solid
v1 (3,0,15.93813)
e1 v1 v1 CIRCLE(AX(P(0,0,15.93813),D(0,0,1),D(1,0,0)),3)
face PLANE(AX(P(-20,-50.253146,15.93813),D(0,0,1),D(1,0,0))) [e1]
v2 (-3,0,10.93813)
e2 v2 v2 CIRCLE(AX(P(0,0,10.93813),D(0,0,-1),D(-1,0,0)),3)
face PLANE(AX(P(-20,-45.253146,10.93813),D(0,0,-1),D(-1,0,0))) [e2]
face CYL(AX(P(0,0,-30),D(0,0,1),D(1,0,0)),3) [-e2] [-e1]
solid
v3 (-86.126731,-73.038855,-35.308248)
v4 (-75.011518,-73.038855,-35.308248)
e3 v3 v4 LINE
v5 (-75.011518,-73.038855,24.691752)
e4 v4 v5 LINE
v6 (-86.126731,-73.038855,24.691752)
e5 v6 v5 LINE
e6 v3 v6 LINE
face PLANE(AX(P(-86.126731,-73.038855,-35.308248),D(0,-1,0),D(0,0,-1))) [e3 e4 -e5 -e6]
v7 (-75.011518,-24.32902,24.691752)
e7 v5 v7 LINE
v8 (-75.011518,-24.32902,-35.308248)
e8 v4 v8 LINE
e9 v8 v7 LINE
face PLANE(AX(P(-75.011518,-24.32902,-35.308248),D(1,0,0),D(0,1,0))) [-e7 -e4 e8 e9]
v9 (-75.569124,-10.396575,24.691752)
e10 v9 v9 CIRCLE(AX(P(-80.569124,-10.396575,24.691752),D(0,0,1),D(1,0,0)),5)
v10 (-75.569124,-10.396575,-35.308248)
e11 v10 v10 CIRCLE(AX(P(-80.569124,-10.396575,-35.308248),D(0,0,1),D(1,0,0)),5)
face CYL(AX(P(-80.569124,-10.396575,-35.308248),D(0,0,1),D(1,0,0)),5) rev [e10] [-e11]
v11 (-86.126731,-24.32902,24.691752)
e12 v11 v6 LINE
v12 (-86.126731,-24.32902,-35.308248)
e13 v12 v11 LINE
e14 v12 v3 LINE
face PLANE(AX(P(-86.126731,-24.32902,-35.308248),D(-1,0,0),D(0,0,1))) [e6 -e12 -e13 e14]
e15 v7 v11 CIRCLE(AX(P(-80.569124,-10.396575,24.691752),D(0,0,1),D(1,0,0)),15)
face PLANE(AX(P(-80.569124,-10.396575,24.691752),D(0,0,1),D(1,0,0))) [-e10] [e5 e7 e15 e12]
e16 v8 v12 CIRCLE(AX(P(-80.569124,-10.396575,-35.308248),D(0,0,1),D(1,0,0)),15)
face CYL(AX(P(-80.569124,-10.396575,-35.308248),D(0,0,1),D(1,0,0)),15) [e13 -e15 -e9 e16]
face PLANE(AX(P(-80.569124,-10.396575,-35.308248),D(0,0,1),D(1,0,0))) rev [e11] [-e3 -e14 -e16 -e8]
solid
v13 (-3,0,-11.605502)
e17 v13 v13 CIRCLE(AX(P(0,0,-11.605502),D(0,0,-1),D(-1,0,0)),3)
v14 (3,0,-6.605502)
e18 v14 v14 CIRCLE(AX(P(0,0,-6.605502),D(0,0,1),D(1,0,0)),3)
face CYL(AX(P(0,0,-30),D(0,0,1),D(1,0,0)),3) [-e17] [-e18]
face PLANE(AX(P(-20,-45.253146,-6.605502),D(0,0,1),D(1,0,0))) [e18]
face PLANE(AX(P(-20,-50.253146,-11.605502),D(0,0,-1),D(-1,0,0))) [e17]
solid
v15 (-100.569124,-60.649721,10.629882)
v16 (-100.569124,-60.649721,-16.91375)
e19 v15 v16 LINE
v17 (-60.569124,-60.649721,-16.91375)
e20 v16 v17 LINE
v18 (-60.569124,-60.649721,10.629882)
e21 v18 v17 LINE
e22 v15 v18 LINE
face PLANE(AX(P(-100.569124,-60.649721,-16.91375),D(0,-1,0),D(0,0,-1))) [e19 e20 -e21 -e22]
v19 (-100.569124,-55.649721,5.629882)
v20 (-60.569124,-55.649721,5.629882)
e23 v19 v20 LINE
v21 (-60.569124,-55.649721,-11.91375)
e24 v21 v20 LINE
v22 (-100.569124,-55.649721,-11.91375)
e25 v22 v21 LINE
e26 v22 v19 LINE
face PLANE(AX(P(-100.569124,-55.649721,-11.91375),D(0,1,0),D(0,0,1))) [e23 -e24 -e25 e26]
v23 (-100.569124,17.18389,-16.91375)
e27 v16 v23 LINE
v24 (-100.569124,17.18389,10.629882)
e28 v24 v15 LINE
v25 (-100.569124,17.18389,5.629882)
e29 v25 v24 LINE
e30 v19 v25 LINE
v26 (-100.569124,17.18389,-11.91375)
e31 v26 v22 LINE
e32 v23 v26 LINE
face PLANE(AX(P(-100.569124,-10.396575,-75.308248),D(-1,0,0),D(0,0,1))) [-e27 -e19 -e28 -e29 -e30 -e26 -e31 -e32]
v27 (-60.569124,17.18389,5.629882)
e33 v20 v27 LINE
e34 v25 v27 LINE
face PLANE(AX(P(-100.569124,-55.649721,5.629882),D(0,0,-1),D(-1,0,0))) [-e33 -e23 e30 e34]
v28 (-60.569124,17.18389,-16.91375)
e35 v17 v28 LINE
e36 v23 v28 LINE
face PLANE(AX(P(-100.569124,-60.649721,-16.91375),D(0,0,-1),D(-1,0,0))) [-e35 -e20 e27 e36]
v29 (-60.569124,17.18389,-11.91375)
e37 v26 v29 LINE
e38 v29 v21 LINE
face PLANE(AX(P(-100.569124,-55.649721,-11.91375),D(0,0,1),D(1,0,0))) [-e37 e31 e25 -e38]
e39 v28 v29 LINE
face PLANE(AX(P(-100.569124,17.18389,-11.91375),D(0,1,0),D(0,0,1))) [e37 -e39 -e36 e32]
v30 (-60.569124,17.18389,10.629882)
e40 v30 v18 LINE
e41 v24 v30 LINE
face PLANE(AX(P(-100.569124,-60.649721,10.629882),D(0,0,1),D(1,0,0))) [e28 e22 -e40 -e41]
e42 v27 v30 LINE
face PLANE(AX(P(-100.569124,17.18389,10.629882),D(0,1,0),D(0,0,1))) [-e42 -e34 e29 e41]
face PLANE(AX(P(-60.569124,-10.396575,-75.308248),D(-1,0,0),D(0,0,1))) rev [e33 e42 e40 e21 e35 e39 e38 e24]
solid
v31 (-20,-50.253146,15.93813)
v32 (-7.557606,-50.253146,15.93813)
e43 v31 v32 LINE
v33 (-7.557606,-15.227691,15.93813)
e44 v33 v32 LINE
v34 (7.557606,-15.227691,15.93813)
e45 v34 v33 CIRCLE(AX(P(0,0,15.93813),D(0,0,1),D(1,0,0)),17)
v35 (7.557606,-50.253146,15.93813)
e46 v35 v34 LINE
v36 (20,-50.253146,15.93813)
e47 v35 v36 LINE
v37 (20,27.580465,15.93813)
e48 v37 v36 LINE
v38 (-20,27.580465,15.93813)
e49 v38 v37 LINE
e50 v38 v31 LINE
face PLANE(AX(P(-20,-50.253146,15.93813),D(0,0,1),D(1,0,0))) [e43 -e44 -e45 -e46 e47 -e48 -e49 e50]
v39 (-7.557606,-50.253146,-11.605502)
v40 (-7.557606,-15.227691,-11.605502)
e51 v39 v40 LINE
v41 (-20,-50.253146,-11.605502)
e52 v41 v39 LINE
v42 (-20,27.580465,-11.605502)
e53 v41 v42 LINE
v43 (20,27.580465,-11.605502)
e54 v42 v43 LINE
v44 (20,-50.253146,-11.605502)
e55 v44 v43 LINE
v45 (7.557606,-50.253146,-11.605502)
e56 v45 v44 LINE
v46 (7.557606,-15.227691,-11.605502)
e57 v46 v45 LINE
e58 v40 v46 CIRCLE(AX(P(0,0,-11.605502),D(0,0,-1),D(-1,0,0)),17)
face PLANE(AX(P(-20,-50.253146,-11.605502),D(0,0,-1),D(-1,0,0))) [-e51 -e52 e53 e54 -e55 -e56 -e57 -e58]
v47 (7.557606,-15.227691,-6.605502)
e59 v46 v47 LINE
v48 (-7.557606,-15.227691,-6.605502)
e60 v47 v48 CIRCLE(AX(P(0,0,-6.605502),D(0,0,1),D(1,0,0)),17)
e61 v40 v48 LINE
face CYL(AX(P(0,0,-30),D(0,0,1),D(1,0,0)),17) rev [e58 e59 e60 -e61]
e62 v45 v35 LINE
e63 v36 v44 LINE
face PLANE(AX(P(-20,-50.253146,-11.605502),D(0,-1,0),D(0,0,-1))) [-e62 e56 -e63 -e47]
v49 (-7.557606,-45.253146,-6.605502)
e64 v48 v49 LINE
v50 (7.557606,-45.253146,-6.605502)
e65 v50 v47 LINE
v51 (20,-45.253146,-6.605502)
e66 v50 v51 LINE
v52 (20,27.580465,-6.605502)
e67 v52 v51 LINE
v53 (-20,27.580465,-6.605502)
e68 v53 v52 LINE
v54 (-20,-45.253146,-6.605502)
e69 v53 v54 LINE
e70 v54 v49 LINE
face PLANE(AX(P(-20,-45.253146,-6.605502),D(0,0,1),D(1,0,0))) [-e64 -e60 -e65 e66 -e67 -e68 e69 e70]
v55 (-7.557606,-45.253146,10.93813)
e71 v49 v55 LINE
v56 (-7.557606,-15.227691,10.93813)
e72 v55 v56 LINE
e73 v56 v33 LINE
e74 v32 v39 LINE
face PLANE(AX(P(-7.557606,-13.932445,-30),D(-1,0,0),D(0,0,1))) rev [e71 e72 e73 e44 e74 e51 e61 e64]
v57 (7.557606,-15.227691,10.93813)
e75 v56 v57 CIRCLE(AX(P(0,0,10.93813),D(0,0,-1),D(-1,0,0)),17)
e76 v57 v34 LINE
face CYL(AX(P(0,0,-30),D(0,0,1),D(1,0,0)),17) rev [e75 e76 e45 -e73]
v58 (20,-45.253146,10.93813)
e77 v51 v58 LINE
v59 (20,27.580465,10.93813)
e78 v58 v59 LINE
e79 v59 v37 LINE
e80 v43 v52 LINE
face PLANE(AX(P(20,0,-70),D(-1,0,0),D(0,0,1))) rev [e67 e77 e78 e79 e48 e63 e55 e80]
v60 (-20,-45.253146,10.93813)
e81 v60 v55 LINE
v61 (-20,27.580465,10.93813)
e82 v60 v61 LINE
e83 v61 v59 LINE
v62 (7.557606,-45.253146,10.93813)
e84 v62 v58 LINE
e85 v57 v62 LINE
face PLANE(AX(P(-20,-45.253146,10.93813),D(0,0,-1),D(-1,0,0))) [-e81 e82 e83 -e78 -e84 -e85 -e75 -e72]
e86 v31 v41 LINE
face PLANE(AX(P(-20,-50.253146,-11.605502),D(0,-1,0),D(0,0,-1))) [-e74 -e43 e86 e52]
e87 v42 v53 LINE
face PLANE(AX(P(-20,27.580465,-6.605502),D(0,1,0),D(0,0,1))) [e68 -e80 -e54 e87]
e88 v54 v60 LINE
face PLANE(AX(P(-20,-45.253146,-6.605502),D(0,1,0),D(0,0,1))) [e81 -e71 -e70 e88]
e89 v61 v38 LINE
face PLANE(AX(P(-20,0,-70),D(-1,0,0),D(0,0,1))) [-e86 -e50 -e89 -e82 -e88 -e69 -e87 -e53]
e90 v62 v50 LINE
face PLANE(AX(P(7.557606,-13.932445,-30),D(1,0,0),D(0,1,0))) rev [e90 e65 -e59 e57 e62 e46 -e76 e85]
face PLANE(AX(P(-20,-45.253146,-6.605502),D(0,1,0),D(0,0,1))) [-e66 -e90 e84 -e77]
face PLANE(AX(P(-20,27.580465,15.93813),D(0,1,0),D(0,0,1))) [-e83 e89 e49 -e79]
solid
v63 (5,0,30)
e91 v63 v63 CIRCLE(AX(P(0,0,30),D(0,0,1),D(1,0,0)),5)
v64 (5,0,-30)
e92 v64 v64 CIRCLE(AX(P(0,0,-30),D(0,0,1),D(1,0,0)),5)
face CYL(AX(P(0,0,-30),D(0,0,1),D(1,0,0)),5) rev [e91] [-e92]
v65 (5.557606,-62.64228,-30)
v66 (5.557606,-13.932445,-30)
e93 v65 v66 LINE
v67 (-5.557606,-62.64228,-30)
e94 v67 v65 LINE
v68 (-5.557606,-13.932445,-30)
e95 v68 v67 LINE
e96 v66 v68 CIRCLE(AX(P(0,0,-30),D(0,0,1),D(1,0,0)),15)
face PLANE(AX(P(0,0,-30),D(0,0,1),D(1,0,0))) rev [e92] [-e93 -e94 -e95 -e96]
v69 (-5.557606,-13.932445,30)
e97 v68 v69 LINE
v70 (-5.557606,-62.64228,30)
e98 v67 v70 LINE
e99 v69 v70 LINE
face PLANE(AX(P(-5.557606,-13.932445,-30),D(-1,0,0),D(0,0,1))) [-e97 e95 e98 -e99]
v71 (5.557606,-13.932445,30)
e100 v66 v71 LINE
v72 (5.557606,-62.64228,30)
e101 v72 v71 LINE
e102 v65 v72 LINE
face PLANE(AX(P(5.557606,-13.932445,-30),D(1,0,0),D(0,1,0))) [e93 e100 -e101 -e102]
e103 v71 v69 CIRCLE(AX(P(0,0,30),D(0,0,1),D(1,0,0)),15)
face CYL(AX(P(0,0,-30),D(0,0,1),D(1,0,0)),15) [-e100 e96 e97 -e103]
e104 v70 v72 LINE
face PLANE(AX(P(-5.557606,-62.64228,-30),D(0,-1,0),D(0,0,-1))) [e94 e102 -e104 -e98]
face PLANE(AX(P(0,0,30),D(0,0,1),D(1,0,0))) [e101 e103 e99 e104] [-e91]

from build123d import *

# Parameters (mm, degrees)
EXTRUDE_5_DEPTH      = 30
EXTRUDE_5_DEPTH_BACK = 30
F_1_FR_R             = 5
EXTRUDE_6_DEPTH      = 20
EXTRUDE_6_DEPTH_BACK = 20
OTHER_START          = -11.605501957
OTHER_1_DEPTH        = 27.543632219
OTHER_START_2        = 10.938130262
OTHER_1_2_OUTLINE_R  = 3
OTHER_1_2_DEPTH      = 5
OTHER_1_3_OUTLINE_R  = 3
OTHER_1_3_DEPTH      = 5
THIS1_2_START        = -60.64972081
THIS1_2_OUTLINE_W    = 40
THIS1_2_OUTLINE_H    = 5
THIS1_2_DEPTH        = 77.833611116
THIS1_2_2_OUTLINE_W  = 40
THIS1_2_2_OUTLINE_H  = 17.543632218
THIS1_2_2_DEPTH      = 5
THIS1_2_START_2      = -35.308248488
THIS1_2_3_OUTLINE_R  = 5
THIS1_2_3_DEPTH      = 60


# Read off the part's stored shape, not the designer's step: Отступ1, this1_2
with BuildPart() as part:
    # Эскиз1_fr → Бобышка-Вытянуть5 (new, two sides: drawn at the far end of the back side and taken through both)
    with BuildSketch(Plane.XY.offset(-EXTRUDE_5_DEPTH_BACK)):
        with BuildLine():
            Line((-5.557606452, -13.932444528), (-5.557606452, -62.642280008))
            Line((-5.557606452, -62.642280008), (5.557606452, -62.642280008))
            Line((5.557606452, -62.642280008), (5.557606452, -13.932444528))
            ThreePointArc((5.557606452, -13.932444528), (0, 15), (-5.557606452, -13.932444528))
        make_face()
        Circle(F_1_FR_R, mode=Mode.SUBTRACT)
    extrude(amount=EXTRUDE_5_DEPTH + EXTRUDE_5_DEPTH_BACK)


with BuildPart() as body_2:
    # Эскиз3 → Бобышка-Вытянуть6 (new, two sides: drawn at the far end of the back side and taken through both)
    with BuildSketch(Plane(origin=(0, 0, 0), x_dir=(0, 0, -1), z_dir=(1, 0, 0)).offset(-EXTRUDE_6_DEPTH_BACK)):
        Polygon((-58.394498043, -50.25314581), (-85.938130262, -50.25314581), (-85.938130262, 27.580465306), (-80.938130262, 27.580465306), (-80.938130262, -45.25314581), (-63.394498043, -45.25314581), (-63.394498043, 27.580465306), (-58.394498043, 27.580465306), align=None)
    extrude(amount=EXTRUDE_6_DEPTH + EXTRUDE_6_DEPTH_BACK)


with BuildPart() as body_2_1:
    # Move Body 1: moved
    add(body_2.part.moved(Location((0, 0, -70))))

    # Отступ1 outline → Отступ1 (cut)
    with BuildSketch(Plane.XY.offset(OTHER_START)):
        with BuildLine():
            ThreePointArc((7.557606452, -15.227691378), (0, 17), (-7.557606452, -15.227691378))
            Line((-7.557606452, -15.227691378), (-7.557606452, -50.25314581))
            Line((-7.557606452, -50.25314581), (7.557606452, -50.25314581))
            Line((7.557606452, -50.25314581), (7.557606452, -15.227691378))
        make_face()
    extrude(amount=OTHER_1_DEPTH, mode=Mode.SUBTRACT)


with BuildPart() as body_3:
    # Other 1 2 outline → Other 1 2 (new body)
    with BuildSketch(Plane.XY.offset(OTHER_START_2)):
        Circle(OTHER_1_2_OUTLINE_R)
    extrude(amount=OTHER_1_2_DEPTH)


with BuildPart() as body_4:
    # Other 1 3 outline → Other 1 3 (new body)
    with BuildSketch(Plane.XY.offset(OTHER_START)):
        Circle(OTHER_1_3_OUTLINE_R)
    extrude(amount=OTHER_1_3_DEPTH)


with BuildPart() as body_5:
    # this1_2 outline → this1_2 (new body)
    with BuildSketch(Plane(origin=(0, 0, 0), x_dir=(1, 0, 0), z_dir=(0, 1, 0)).offset(THIS1_2_START)):
        with Locations((-80.569124199, 14.413750445)):
            Rectangle(THIS1_2_OUTLINE_W, THIS1_2_OUTLINE_H)
        with Locations((-80.569124199, -8.129881773)):
            Rectangle(THIS1_2_OUTLINE_W, THIS1_2_OUTLINE_H)
    extrude(amount=THIS1_2_DEPTH)

    # this1_2 2 outline → this1_2 2 (add)
    with BuildSketch(Plane(origin=(0, 0, 0), x_dir=(1, 0, 0), z_dir=(0, 1, 0)).offset(THIS1_2_START)):
        with Locations((-80.569124199, 3.141934336)):
            Rectangle(THIS1_2_2_OUTLINE_W, THIS1_2_2_OUTLINE_H)
    extrude(amount=THIS1_2_2_DEPTH)


with BuildPart() as body_6:
    # this1_2 3 outline → this1_2 3 (new body)
    with BuildSketch(Plane.XY.offset(THIS1_2_START_2)):
        with BuildLine():
            Line((-75.011517747, -73.038855008), (-75.011517747, -24.329019528))
            ThreePointArc((-75.011517747, -24.329019528), (-80.569124199, 4.603425), (-86.126730651, -24.329019528))
            Line((-86.126730651, -24.329019528), (-86.126730651, -73.038855008))
            Line((-86.126730651, -73.038855008), (-75.011517747, -73.038855008))
        make_face()
        with Locations((-80.569124199, -10.396575)):
            Circle(THIS1_2_3_OUTLINE_R, mode=Mode.SUBTRACT)
    extrude(amount=THIS1_2_3_DEPTH)


solid = Compound([part.part, body_2_1.part, body_3.part, body_4.part, body_5.part, body_6.part])
